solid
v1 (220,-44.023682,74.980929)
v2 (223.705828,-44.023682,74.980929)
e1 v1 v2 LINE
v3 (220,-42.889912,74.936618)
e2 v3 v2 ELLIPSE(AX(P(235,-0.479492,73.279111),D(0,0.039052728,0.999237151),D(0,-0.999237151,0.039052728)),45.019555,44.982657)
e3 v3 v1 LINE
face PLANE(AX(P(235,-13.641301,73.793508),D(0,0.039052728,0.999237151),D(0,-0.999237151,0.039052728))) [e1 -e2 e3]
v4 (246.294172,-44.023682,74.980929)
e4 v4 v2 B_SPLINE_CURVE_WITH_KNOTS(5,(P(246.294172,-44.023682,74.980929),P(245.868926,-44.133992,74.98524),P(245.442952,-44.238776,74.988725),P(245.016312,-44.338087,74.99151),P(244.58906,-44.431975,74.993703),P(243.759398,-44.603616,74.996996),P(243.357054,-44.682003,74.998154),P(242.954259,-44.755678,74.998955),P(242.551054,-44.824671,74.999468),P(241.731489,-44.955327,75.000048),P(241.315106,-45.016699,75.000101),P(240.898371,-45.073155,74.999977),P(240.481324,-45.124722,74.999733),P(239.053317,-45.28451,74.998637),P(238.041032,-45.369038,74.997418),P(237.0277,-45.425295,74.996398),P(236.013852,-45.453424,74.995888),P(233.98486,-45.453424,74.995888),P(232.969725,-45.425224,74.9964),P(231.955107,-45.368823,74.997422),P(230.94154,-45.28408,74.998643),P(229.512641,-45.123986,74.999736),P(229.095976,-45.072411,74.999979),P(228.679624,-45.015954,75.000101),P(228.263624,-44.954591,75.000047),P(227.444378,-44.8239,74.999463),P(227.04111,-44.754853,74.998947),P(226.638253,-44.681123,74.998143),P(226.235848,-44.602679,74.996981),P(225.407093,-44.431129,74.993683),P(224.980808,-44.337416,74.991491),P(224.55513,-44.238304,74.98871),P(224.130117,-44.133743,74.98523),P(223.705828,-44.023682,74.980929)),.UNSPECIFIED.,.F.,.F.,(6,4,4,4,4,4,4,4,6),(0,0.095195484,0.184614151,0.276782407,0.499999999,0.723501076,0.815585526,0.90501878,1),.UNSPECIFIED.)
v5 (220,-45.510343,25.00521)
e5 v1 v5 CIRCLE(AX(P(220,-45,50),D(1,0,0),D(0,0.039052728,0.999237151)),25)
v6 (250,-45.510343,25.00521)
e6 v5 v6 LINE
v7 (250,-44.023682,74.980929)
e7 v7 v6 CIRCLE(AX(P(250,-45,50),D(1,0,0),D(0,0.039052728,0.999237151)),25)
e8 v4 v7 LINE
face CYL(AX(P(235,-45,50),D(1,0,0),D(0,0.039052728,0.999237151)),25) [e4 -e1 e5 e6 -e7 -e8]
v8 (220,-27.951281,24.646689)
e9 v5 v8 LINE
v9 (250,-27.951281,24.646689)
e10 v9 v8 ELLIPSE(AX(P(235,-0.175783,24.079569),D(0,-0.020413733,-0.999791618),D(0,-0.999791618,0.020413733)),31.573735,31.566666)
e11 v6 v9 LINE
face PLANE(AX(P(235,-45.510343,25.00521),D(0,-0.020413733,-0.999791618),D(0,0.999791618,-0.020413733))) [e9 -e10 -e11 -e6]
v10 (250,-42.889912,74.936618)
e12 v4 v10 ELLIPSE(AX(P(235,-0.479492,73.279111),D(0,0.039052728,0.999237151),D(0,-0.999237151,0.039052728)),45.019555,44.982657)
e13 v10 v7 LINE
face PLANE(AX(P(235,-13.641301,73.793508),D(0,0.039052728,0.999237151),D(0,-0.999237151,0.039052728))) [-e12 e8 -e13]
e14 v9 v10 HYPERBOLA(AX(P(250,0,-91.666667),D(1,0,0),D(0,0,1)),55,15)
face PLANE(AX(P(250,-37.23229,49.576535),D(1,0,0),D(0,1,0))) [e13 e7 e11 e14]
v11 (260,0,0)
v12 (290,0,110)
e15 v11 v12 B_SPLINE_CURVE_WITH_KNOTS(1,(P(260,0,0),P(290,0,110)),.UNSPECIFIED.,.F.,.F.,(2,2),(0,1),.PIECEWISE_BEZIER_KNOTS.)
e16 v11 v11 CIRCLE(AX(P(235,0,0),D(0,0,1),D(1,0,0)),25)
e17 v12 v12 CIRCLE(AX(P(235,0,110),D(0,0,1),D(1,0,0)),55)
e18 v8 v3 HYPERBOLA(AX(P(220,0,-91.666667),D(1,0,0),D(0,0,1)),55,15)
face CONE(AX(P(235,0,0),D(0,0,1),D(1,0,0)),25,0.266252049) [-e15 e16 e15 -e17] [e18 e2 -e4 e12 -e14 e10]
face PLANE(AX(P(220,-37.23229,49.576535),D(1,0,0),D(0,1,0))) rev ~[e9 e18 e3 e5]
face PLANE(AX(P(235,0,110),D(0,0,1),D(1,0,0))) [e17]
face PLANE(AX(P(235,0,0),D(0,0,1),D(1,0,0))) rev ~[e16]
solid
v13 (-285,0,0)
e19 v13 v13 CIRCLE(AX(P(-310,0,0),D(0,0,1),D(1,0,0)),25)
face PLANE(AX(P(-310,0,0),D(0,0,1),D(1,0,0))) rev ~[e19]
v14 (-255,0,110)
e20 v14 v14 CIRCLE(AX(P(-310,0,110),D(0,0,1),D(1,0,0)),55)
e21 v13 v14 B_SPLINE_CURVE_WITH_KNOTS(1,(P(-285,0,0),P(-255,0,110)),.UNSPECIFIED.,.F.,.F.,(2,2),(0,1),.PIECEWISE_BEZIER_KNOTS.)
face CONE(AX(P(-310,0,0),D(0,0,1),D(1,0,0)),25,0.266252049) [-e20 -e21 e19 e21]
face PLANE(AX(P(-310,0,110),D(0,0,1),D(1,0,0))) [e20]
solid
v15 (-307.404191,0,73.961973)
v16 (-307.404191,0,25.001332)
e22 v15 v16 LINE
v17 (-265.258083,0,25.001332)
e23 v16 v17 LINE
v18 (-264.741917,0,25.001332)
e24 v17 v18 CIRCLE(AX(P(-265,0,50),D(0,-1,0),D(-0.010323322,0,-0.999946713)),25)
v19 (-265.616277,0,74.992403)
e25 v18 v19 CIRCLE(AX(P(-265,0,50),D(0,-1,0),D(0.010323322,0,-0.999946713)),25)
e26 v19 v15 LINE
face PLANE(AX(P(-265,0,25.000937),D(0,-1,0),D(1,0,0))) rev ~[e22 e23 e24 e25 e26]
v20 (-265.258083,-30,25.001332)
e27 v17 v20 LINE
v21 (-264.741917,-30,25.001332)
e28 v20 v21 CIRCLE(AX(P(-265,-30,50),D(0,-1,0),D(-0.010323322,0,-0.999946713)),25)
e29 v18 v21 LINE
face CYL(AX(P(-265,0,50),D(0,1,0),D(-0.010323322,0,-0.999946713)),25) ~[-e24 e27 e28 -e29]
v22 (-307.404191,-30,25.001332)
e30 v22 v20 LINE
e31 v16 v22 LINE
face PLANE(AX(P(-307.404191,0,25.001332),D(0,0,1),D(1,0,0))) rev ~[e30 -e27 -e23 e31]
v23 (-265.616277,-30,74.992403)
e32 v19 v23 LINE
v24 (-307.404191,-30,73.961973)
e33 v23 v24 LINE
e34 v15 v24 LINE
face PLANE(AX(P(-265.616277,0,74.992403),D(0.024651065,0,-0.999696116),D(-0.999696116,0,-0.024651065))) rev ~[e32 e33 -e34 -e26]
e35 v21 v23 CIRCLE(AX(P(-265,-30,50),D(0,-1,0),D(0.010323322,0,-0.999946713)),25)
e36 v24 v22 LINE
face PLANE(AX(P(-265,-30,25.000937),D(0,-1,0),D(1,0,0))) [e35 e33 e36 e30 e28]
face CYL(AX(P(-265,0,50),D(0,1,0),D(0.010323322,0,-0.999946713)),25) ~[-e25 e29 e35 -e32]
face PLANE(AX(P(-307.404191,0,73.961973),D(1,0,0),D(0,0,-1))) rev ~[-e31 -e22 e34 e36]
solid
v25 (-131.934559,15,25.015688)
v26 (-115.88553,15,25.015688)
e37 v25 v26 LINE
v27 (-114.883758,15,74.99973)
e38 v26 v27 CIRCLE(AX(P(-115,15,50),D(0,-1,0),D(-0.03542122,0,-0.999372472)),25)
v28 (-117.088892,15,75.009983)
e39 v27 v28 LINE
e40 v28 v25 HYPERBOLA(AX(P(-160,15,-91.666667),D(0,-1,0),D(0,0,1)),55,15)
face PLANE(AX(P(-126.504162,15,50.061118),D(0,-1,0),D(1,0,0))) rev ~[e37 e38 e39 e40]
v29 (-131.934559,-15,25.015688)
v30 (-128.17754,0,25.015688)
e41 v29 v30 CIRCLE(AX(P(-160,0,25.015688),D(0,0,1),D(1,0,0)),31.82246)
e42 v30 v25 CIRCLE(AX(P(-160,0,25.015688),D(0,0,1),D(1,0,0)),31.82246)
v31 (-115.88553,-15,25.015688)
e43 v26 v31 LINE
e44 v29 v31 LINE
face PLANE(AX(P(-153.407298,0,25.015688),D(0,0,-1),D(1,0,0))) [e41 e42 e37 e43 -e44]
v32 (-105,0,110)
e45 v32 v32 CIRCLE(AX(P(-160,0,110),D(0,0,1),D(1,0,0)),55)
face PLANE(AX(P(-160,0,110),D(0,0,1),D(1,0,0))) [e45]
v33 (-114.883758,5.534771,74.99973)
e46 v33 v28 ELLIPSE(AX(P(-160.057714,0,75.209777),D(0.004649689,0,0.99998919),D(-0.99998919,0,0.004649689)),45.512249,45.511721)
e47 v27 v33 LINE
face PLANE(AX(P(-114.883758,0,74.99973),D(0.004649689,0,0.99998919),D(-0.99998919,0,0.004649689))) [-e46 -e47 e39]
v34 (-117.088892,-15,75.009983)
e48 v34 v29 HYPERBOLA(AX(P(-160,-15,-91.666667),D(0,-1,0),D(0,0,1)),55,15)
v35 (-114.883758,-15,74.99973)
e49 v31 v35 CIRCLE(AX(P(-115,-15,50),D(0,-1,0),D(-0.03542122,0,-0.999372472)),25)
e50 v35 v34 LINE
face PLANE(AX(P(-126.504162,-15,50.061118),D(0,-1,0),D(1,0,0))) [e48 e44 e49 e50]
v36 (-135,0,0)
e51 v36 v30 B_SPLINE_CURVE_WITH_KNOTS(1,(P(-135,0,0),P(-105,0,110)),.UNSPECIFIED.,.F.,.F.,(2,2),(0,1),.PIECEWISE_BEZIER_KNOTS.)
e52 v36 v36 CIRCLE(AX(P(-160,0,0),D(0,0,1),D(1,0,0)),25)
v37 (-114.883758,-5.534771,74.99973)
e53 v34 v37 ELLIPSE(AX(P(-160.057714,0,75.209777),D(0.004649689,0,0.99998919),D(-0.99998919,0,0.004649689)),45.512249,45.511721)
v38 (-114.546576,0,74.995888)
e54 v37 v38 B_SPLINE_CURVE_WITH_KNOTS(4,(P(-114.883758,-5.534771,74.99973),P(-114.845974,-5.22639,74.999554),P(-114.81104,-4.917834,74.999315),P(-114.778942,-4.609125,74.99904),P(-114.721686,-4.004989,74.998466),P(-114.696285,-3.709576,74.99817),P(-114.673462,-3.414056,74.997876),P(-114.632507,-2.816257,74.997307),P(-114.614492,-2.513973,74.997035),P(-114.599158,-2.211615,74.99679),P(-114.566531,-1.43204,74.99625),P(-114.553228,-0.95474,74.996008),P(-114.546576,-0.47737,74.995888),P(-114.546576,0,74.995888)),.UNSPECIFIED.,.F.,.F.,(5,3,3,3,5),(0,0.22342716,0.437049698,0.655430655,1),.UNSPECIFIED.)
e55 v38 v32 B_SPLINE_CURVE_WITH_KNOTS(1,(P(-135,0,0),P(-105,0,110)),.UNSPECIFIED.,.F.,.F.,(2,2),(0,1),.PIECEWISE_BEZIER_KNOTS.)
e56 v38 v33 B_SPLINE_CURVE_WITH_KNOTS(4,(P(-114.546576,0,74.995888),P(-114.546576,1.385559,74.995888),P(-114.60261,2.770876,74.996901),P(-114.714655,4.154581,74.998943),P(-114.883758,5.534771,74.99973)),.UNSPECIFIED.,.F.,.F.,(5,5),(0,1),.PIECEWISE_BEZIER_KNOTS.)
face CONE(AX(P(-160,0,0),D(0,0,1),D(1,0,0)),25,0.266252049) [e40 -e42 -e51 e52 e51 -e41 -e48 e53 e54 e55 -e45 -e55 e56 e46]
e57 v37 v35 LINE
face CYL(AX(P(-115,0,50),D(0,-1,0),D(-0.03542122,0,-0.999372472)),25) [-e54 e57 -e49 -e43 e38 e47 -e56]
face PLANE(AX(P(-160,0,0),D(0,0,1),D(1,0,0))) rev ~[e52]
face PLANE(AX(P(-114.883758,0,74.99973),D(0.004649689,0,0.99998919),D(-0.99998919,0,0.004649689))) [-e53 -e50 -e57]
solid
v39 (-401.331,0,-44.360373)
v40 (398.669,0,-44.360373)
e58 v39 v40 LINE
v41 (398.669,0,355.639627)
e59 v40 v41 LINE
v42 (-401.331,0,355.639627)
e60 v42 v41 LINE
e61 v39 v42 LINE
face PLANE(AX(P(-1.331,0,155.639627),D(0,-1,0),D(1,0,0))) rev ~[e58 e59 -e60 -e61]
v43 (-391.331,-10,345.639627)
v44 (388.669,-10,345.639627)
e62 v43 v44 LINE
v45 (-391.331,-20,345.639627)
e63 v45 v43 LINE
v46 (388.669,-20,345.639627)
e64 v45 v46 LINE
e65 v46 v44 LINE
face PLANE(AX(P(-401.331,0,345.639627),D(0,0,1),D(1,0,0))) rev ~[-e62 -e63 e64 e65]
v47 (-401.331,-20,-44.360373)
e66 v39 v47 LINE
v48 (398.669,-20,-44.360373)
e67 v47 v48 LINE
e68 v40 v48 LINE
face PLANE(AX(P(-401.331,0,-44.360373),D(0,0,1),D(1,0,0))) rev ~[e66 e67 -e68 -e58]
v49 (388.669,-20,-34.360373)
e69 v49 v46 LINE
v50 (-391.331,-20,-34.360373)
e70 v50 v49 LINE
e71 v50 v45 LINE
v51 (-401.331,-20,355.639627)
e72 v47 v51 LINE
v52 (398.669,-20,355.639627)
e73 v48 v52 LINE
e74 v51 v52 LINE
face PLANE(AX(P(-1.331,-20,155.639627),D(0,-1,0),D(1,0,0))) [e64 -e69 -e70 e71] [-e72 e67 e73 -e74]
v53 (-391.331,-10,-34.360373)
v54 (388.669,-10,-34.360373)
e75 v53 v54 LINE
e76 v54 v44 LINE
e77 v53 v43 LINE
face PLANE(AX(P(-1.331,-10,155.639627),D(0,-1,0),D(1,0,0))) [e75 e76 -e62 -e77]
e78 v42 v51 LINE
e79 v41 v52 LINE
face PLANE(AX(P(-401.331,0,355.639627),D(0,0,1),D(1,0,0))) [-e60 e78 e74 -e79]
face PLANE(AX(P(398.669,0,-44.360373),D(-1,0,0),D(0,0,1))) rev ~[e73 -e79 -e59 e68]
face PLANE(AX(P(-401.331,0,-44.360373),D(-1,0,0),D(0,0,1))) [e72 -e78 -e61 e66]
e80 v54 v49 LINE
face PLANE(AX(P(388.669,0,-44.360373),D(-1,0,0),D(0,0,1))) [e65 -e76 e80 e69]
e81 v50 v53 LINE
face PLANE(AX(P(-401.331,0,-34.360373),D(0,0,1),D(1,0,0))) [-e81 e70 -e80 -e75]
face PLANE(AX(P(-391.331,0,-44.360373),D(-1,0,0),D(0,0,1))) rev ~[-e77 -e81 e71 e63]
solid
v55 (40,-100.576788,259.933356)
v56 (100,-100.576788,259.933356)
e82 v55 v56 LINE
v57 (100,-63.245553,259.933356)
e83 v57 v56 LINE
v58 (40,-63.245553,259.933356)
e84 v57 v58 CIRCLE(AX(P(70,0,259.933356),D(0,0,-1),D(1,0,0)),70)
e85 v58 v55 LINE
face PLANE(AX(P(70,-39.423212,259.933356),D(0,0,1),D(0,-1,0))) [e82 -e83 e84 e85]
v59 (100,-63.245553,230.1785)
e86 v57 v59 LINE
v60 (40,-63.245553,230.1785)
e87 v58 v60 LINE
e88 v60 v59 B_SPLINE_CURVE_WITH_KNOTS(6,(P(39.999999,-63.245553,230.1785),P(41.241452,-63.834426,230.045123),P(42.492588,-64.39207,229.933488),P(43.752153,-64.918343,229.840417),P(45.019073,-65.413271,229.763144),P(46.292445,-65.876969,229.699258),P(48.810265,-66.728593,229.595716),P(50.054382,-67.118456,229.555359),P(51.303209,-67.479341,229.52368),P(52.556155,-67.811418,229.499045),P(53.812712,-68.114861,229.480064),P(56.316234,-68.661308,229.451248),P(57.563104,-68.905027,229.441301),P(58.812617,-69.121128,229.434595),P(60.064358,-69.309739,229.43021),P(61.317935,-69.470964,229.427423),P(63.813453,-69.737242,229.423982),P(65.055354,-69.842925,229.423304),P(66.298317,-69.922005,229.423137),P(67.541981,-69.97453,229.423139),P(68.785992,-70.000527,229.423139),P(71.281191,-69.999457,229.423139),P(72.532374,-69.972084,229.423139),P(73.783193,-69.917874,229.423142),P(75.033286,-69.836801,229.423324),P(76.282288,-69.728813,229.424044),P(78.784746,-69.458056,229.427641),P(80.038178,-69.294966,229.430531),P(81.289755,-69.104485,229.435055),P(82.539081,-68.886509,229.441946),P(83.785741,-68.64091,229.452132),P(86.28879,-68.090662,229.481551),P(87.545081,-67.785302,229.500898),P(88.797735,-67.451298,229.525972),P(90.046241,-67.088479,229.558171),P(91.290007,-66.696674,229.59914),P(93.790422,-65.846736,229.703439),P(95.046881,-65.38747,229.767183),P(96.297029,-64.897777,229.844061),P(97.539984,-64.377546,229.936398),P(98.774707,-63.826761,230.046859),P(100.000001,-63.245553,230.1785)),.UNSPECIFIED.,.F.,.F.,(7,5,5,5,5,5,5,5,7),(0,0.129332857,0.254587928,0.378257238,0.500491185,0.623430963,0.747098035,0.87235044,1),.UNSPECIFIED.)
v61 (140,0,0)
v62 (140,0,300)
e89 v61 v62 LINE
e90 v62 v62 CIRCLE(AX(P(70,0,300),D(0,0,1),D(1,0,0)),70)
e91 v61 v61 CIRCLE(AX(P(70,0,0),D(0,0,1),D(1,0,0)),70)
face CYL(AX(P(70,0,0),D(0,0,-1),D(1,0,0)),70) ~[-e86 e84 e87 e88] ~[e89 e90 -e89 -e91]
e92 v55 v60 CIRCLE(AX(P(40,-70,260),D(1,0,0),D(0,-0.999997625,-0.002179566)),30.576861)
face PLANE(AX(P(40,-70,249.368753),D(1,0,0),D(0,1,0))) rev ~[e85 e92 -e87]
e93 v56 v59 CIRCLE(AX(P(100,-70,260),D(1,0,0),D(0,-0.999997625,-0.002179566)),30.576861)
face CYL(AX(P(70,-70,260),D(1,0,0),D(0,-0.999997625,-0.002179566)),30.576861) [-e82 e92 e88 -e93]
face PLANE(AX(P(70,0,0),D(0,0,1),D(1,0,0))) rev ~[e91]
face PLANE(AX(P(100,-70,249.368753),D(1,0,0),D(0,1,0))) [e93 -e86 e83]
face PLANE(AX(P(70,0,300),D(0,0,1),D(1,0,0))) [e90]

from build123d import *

# Parameters (mm, degrees)
F1_R      = 70
F2_DEPTH  = 300
F3_R      = 25
F4_R      = 55
F6_R      = 25
F7_R      = 55
F9_R      = 25
F10_R     = 55
F14_DEPTH = 30
F17_DEPTH = 15
F19_DEPTH = 15
F21_DEPTH = 30
F22_W     = 800
F22_H     = 400
F24_DEPTH = 20
F25_T     = -10


# Not quite as in the source:
# - a feature names something its author has since deleted; it is built from what else it names


with BuildPart() as f2:
    # F1 (on Top) → F2 (new body)
    with BuildSketch(Plane.XY):
        with Locations((70, 0)):
            Circle(F1_R)
    extrude(amount=F2_DEPTH)

    # F13 (on offset) → F14 (join, symmetric)
    with BuildSketch(Plane.YZ.offset(70)):
        with BuildLine():
            Line((-39.4232119037, 259.9333557068), (-100.5767880963, 259.9333557068))
            ThreePointArc((-100.5767880963, 259.9333557068), (-70, 229.4231392758), (-39.4232119037, 259.9333557068))
        make_face()
    extrude(amount=F14_DEPTH, both=True)


with BuildPart() as f5:
    # F3 (on Top) → F5 section 0
    with BuildSketch(Plane.XY):
        with Locations((235, 0)):
            Circle(F3_R)
    # F4 (on offset) → F5 section 1
    with BuildSketch(Plane.XY.offset(110)):
        with Locations((235, 0)):
            Circle(F4_R)
    loft()

    # F16 (on offset) → F17 (join, symmetric)
    with BuildSketch(Plane.YZ.offset(235)):
        with BuildLine():
            Line((-13.6413012409, 73.7935081125), (-44.023681798, 74.9809287811))
            ThreePointArc((-44.023681798, 74.9809287811), (-69.9889457828, 50.7433630762), (-45.5103433285, 25.005209549))
            Line((-45.5103433285, 25.005209549), (-13.6413012409, 24.3545078339))
            Line((-13.6413012409, 24.3545078339), (-13.6413012409, 73.7935081125))
        make_face()
    extrude(amount=F17_DEPTH, both=True)


with BuildPart() as f8:
    # F6 (on Top) → F8 section 0
    with BuildSketch(Plane.XY):
        with Locations((-160, 0)):
            Circle(F6_R)
    # F7 (on offset) → F8 section 1
    with BuildSketch(Plane.XY.offset(110)):
        with Locations((-160, 0)):
            Circle(F7_R)
    loft()

    # F18 (on Front) → F19 (join, symmetric)
    with BuildSketch(Plane.XZ):
        with BuildLine():
            Line((-153.4072975938, 25.0156882073), (-115.885530489, 25.0156882073))
            ThreePointArc((-115.885530489, 25.0156882073), (-90.0050194353, 49.4990543238), (-114.8837577761, 74.9997297534))
            Line((-114.8837577761, 74.9997297534), (-153.4072975938, 75.1788541675))
            Line((-153.4072975938, 75.1788541675), (-153.4072975938, 25.0156882073))
        make_face()
    extrude(amount=F19_DEPTH, both=True)


with BuildPart() as f11:
    # F9 (on Top) → F11 section 0
    with BuildSketch(Plane.XY):
        with Locations((-310, 0)):
            Circle(F9_R)
    # F10 (on offset) → F11 section 1
    with BuildSketch(Plane.XY.offset(110)):
        with Locations((-310, 0)):
            Circle(F10_R)
    loft()


with BuildPart() as f21:
    # F20 (on Front) → F21 (new body)
    with BuildSketch(Plane.XZ):
        with BuildLine():
            Line((-264.7419169597, 25.0013321726), (-265.2580830403, 25.0013321726))
            ThreePointArc((-265.2580830403, 25.0013321726), (-265, 25), (-264.7419169597, 25.0013321726))
        make_face()
        with BuildLine():
            Line((-307.4041914523, 25.0013321726), (-265.2580830403, 25.0013321726))
            Line((-265.2580830403, 25.0013321726), (-264.7419169597, 25.0013321726))
            ThreePointArc((-264.7419169597, 25.0013321726), (-240.0038230126, 50.4371910495), (-265.6162766145, 74.9924029084))
            Line((-265.6162766145, 74.9924029084), (-307.4041914523, 73.9619731903))
            Line((-307.4041914523, 73.9619731903), (-307.4041914523, 25.0013321726))
        make_face()
    extrude(amount=F21_DEPTH)


with BuildPart() as f24:
    # F22 (on Front) → F24 (new body)
    with BuildSketch(Plane.XZ):
        with Locations((-1.331, 155.6396274999)):
            Rectangle(F22_W, F22_H)
    extrude(amount=F24_DEPTH)

    # F25
    f25_openings = [f24.faces().sort_by_distance(p)[0] for p in [
        (-1.331, -20, 155.639627),
    ]]
    offset(amount=F25_T, openings=f25_openings)


solid = Compound([f2.part, f5.part, f8.part, f11.part, f21.part, f24.part])
